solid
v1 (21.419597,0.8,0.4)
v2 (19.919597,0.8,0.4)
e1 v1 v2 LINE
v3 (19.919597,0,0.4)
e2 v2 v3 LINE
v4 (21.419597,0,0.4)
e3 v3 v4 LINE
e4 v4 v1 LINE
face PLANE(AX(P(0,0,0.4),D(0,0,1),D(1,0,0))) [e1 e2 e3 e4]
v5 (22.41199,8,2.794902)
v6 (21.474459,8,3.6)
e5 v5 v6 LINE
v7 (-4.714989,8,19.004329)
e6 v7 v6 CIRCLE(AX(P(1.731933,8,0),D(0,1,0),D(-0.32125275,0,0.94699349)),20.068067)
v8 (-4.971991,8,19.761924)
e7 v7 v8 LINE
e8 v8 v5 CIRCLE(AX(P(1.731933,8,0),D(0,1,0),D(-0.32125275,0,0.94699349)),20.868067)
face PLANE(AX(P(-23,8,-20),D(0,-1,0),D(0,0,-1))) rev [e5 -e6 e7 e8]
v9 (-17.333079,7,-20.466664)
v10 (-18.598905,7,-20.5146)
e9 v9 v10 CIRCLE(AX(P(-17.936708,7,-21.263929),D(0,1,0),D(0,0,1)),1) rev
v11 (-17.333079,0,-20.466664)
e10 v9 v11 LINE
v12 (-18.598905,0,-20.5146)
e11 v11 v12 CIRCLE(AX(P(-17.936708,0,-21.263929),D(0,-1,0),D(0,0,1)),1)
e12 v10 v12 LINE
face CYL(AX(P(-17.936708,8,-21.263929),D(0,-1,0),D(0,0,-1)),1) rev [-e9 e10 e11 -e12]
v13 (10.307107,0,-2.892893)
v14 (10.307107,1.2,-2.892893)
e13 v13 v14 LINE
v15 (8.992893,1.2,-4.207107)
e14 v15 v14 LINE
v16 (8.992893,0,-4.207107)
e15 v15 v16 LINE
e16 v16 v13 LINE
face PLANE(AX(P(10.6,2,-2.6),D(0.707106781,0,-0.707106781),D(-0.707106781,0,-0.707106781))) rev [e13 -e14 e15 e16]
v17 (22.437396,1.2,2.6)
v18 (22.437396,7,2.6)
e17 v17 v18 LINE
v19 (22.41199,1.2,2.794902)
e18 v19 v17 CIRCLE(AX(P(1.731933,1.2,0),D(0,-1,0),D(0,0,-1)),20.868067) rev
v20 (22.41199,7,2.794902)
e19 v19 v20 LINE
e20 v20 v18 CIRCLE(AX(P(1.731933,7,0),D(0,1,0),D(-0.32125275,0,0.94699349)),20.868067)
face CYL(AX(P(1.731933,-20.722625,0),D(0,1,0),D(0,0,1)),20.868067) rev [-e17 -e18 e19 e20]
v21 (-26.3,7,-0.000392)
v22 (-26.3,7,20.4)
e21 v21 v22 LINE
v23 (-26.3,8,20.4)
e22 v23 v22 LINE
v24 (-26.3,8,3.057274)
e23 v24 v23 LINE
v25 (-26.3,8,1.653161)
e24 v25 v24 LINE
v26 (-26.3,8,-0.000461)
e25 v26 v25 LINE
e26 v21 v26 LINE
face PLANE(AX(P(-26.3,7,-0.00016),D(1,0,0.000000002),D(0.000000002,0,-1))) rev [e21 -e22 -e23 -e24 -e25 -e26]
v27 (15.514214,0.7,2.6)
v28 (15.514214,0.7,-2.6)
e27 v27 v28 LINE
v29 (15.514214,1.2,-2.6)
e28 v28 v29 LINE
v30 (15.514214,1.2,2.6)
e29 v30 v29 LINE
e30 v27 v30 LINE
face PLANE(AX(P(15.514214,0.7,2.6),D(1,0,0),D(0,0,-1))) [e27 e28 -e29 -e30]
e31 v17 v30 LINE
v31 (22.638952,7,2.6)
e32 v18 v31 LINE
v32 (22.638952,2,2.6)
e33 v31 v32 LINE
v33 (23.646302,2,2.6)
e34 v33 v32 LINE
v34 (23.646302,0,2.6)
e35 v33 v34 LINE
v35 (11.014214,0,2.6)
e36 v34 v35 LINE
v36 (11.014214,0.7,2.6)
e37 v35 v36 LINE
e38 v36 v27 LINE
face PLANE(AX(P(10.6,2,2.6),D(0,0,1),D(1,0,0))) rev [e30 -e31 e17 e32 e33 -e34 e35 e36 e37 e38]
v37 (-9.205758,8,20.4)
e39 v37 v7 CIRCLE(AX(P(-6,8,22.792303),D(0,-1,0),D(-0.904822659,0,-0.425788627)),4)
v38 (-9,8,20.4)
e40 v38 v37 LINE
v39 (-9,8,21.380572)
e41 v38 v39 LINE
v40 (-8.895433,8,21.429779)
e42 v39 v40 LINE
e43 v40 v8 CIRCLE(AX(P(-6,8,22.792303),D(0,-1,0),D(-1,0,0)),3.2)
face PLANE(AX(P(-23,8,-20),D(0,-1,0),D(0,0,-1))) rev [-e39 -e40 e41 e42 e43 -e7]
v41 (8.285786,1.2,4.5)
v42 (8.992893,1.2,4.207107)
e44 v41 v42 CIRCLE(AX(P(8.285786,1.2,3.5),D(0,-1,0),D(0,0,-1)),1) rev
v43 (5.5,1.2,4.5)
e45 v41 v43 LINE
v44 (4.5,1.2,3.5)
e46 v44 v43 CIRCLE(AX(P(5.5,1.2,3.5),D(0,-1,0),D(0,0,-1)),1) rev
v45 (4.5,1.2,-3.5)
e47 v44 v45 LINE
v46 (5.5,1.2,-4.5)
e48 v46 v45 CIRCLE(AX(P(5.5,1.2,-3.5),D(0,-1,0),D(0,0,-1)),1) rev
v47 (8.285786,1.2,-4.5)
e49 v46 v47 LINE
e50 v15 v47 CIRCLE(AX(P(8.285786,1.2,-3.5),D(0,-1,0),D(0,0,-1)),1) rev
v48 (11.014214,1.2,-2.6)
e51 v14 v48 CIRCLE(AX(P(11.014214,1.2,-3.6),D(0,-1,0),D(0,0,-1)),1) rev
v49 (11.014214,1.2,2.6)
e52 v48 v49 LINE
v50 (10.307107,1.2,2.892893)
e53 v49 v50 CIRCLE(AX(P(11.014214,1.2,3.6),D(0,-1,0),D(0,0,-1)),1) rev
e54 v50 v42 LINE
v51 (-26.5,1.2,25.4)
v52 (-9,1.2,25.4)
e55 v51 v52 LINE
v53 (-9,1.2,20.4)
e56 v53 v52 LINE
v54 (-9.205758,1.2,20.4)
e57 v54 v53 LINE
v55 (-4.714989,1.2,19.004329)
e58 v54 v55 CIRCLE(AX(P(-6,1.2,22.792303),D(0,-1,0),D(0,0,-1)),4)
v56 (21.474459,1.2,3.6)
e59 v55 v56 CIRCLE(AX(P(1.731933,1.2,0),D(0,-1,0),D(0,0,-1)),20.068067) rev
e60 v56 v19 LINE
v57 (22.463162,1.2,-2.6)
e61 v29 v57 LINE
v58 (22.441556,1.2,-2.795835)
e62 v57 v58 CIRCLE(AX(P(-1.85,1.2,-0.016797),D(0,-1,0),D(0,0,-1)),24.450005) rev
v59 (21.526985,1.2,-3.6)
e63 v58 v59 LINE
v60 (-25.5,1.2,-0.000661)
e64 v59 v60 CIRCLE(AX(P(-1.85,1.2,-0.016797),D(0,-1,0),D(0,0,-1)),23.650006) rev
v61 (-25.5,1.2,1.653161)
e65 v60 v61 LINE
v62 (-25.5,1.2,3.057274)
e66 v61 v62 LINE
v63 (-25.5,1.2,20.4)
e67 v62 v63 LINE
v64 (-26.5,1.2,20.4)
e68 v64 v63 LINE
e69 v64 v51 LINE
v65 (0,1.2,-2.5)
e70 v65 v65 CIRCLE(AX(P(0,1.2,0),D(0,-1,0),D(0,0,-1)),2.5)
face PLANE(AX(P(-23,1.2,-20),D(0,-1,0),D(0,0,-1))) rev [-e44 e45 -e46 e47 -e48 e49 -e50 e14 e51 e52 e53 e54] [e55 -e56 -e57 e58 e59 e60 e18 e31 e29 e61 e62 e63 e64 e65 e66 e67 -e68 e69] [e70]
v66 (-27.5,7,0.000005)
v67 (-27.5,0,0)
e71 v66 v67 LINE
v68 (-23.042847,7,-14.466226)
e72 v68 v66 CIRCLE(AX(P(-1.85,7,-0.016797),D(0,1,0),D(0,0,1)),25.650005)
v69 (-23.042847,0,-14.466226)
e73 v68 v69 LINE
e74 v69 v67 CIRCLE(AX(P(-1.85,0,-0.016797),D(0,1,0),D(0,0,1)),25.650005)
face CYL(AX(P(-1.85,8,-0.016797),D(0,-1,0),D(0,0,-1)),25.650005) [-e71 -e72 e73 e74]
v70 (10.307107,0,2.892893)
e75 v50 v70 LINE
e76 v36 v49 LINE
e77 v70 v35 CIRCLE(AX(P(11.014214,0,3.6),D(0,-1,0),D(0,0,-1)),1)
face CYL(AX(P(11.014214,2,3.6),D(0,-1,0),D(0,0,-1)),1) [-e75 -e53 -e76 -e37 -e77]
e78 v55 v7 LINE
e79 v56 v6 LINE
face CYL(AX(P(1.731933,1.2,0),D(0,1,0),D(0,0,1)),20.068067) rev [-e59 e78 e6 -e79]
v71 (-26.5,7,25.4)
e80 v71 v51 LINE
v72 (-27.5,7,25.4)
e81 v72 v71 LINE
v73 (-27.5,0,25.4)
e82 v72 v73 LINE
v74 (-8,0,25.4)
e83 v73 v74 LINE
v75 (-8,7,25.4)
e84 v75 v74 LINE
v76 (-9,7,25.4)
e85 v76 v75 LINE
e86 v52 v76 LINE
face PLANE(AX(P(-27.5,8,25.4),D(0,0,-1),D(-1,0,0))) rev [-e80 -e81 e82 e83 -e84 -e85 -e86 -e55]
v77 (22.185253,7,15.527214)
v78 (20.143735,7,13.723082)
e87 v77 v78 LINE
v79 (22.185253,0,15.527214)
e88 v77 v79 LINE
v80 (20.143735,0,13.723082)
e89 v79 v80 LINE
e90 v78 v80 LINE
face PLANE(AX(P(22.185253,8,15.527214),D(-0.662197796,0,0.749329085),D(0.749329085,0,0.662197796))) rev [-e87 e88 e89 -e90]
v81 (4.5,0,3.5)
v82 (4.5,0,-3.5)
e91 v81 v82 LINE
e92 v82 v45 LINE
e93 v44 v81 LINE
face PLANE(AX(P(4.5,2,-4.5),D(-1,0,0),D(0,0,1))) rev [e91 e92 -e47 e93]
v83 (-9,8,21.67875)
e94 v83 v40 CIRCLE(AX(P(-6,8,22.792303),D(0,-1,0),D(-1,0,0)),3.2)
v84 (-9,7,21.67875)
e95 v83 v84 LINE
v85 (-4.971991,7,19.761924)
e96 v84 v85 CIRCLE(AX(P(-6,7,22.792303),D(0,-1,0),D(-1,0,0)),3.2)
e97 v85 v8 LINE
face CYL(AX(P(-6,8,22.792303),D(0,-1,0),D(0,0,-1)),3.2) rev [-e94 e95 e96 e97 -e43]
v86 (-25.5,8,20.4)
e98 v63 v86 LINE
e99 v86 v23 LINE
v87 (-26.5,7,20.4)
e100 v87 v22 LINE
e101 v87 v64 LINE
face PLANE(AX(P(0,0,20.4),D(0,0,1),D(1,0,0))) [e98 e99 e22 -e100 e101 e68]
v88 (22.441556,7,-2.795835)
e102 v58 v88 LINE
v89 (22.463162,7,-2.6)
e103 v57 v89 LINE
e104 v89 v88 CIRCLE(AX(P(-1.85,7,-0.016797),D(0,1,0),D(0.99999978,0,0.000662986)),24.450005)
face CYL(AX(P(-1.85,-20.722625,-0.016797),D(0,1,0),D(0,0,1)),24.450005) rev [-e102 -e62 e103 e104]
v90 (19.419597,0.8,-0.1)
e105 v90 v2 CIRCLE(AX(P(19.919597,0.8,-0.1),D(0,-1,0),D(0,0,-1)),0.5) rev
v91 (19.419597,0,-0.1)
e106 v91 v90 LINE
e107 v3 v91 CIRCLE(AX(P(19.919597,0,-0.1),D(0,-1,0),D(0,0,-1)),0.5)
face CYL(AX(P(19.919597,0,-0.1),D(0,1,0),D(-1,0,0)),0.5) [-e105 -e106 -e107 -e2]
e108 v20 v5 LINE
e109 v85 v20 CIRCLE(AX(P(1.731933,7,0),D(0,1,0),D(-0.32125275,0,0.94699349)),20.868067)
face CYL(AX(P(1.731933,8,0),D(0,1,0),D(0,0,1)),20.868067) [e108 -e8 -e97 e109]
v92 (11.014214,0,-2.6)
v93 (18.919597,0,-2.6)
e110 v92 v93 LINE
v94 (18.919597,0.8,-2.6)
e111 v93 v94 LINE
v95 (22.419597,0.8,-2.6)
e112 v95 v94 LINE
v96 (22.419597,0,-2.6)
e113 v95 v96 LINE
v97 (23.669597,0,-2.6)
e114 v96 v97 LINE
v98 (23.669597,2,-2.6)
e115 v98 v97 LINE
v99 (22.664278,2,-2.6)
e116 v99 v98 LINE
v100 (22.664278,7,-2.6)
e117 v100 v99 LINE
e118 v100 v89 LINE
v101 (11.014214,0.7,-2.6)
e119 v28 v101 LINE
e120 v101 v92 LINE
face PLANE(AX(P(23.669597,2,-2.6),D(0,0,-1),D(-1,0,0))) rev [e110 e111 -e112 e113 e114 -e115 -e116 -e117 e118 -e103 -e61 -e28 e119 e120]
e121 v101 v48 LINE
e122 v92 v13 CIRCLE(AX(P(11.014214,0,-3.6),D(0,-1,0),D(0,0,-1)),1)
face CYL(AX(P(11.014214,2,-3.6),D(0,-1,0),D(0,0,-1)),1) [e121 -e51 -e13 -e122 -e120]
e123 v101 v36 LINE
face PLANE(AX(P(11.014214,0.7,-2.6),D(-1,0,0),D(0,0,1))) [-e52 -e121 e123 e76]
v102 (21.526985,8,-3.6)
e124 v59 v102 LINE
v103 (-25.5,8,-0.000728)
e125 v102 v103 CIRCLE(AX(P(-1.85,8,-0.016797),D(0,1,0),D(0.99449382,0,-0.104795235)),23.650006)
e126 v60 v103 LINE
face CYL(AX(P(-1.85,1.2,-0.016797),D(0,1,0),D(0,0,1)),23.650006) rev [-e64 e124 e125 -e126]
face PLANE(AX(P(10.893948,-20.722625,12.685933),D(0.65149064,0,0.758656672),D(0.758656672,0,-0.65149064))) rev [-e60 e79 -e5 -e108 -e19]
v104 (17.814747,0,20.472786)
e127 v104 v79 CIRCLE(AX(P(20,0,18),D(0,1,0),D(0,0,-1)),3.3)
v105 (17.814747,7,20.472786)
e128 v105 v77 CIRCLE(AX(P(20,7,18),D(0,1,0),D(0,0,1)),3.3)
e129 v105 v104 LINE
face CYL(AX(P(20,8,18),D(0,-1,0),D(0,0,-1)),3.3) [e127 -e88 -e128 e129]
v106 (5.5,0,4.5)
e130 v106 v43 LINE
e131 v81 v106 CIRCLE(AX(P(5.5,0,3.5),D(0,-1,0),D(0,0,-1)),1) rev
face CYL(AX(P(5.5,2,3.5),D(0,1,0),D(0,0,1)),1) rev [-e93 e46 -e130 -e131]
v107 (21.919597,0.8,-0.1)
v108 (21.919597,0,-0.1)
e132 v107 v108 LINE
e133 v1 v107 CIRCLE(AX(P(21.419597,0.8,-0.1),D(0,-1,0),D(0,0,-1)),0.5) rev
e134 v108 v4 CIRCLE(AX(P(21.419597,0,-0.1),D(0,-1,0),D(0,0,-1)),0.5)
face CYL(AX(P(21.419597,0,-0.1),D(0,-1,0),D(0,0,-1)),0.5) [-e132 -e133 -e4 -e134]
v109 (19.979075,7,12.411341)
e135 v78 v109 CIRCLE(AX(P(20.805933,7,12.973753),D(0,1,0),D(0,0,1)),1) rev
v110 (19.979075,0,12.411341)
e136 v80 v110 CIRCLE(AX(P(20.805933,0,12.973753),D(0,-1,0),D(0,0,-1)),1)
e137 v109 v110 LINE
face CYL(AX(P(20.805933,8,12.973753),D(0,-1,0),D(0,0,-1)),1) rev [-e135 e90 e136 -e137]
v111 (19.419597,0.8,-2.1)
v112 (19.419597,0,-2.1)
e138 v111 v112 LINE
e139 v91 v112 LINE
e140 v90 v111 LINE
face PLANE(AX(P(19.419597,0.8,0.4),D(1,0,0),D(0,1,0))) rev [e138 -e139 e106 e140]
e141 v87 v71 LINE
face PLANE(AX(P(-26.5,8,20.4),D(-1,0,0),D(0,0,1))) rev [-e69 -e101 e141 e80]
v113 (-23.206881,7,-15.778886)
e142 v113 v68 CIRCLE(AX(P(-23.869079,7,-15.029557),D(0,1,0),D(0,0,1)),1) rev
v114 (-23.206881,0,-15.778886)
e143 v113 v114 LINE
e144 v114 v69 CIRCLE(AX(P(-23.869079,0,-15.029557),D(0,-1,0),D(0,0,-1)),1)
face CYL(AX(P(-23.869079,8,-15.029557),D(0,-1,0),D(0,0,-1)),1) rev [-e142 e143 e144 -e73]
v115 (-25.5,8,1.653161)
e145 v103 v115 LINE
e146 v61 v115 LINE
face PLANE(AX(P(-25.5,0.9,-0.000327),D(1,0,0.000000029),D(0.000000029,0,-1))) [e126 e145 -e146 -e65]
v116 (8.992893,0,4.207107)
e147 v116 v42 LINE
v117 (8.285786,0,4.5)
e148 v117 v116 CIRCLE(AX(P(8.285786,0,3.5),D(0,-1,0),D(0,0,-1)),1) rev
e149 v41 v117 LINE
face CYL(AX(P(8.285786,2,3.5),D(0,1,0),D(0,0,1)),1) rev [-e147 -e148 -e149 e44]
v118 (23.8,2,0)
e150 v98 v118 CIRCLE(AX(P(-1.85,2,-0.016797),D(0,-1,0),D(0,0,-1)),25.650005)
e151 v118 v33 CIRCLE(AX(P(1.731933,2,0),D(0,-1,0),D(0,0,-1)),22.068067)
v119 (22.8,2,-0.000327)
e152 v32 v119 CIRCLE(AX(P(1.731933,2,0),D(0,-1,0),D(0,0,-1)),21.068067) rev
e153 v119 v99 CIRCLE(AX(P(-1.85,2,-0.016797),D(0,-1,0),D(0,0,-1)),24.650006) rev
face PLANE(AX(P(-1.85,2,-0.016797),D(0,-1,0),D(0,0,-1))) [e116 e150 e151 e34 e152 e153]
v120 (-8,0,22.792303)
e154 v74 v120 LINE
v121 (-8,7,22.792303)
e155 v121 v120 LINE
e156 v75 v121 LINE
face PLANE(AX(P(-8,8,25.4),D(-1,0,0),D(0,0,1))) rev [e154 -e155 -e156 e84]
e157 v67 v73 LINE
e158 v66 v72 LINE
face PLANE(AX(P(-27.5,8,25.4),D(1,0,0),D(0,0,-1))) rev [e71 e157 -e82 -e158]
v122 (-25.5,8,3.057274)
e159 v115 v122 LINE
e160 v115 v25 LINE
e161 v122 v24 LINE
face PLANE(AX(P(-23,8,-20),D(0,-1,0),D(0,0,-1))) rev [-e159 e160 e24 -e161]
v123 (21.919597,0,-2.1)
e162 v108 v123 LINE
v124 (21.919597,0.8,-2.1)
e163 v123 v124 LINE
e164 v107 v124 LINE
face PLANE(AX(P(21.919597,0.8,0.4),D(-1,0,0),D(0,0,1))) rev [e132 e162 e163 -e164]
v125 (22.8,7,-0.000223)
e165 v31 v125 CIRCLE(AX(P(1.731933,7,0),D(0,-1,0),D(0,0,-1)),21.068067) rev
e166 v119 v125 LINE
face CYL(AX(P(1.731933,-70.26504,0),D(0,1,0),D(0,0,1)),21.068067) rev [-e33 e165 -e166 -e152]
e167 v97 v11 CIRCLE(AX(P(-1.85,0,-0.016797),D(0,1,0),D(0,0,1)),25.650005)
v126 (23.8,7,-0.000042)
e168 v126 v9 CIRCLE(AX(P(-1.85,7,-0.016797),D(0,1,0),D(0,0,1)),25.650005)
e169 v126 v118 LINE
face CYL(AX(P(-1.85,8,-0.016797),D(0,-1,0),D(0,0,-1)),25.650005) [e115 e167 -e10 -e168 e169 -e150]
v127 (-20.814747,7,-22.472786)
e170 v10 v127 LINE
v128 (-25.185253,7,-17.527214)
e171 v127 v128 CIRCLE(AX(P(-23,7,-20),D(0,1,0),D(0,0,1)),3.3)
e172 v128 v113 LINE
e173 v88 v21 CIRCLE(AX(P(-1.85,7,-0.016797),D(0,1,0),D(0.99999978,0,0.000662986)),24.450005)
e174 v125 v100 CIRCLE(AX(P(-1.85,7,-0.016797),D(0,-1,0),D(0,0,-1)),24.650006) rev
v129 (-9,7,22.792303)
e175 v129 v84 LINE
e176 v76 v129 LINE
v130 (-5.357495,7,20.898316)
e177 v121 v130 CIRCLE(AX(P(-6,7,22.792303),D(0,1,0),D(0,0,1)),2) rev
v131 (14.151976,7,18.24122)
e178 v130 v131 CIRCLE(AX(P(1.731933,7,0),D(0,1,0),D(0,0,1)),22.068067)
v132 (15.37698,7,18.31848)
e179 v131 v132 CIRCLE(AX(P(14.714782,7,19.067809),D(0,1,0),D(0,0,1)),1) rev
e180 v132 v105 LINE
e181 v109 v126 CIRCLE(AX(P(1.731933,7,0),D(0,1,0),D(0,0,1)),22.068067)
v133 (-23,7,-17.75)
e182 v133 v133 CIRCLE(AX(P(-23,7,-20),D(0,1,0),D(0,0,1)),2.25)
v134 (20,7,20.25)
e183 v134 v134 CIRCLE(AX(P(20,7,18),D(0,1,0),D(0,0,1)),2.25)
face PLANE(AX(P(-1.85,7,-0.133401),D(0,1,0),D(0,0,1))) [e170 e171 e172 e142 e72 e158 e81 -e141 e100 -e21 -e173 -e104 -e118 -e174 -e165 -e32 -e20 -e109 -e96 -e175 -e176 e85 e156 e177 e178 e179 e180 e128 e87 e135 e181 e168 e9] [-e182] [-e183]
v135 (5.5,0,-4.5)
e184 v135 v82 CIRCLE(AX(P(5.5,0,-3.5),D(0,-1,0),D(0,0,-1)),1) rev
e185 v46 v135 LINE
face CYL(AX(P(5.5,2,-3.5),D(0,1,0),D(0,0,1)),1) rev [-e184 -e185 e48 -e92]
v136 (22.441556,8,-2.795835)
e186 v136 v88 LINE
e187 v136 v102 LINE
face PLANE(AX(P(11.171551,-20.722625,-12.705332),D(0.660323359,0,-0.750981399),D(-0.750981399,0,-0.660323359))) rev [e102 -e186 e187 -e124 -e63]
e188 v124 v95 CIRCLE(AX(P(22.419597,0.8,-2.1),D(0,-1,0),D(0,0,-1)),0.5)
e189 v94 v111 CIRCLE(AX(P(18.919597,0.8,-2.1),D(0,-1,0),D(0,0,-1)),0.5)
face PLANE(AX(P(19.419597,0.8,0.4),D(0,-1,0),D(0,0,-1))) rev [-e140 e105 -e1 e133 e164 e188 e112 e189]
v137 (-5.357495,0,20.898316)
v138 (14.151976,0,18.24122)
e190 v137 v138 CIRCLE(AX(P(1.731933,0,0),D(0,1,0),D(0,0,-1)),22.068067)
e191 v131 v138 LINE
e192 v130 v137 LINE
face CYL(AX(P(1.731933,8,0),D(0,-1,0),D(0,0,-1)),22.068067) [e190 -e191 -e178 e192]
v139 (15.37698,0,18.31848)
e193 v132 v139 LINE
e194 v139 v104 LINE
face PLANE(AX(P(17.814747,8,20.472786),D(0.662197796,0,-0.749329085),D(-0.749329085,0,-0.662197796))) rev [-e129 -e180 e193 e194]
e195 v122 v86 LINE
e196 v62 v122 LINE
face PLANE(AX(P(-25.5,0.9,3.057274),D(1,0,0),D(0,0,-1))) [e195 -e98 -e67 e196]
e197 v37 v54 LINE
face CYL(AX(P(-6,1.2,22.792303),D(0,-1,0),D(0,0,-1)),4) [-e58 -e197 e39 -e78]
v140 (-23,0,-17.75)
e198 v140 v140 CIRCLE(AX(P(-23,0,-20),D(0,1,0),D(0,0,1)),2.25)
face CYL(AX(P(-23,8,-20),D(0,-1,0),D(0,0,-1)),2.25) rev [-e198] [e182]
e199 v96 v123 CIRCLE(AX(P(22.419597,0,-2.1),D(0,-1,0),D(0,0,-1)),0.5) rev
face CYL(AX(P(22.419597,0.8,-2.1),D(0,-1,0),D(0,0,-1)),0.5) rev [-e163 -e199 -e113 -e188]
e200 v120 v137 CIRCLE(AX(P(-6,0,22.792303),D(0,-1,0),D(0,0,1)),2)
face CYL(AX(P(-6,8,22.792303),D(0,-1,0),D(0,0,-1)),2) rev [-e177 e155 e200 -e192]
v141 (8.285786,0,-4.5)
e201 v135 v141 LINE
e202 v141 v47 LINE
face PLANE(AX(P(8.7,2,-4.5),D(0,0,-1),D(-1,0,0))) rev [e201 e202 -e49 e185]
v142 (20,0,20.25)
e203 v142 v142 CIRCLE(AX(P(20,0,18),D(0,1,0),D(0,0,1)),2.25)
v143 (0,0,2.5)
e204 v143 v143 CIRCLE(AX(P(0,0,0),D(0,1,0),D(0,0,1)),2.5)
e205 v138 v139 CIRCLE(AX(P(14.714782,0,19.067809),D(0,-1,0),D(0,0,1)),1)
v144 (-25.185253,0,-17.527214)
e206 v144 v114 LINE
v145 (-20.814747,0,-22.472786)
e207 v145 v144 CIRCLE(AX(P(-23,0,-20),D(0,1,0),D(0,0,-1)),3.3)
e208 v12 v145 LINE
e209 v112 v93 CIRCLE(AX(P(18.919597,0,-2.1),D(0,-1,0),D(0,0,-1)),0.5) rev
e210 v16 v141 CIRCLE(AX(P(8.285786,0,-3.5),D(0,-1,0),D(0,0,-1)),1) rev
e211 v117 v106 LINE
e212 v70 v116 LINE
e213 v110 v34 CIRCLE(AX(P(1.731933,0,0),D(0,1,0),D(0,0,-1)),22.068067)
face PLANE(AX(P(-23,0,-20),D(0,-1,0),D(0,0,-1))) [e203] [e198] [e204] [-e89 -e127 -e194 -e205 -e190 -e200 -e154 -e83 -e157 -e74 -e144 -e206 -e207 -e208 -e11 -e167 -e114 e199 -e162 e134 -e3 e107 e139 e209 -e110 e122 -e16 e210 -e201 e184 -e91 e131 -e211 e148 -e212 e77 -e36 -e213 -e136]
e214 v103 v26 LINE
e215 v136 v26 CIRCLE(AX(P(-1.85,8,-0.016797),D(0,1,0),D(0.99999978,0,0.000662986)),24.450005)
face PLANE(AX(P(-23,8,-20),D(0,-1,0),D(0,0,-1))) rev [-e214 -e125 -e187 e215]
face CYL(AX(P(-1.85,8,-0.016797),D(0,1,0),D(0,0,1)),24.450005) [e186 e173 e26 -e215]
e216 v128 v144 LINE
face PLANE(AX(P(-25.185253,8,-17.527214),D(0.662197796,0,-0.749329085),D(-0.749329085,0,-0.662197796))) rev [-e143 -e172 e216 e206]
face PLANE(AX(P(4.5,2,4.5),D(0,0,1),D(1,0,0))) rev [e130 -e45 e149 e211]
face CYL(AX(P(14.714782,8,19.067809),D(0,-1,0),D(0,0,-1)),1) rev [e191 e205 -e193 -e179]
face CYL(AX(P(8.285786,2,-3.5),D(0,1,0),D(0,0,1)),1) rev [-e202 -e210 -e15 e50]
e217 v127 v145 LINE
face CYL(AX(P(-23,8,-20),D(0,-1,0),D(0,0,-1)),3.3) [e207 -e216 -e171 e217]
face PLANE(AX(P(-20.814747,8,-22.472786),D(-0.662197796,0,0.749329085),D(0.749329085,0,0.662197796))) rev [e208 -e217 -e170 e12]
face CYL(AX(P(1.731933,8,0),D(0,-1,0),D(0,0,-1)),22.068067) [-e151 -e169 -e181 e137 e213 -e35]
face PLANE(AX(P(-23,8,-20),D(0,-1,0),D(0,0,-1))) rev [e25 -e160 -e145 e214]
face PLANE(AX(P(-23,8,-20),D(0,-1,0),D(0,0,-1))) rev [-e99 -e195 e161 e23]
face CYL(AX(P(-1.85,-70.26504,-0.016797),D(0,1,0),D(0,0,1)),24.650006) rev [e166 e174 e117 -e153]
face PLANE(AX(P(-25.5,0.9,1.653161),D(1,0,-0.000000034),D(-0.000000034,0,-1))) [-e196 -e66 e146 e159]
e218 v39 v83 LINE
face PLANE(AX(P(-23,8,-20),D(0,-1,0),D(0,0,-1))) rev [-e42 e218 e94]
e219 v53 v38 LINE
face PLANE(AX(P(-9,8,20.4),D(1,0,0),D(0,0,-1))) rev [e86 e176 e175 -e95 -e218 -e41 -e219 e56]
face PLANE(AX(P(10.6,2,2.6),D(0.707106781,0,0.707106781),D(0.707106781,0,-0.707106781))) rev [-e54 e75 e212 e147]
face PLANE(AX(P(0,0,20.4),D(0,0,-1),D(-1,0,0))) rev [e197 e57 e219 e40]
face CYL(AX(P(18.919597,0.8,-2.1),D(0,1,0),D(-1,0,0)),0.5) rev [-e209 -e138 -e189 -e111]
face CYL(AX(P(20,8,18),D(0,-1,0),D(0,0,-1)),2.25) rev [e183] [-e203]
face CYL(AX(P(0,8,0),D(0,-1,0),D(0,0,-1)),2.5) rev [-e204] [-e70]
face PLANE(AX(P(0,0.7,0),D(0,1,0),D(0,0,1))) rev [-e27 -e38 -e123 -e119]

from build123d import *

# Parameters (mm, degrees)
SKETCH_1_R          = 2.25
SKETCH_1_R_2        = 2.5
EXTRUDE_1_DEPTH     = 8
CUT_EXTRUDE_1_DEPTH = 6.8
SKETCH_3_OUTSIDE_W  = 67.866
SKETCH_3_OUTSIDE_H  = 67.633
CUT_EXTRUDE_4_DEPTH = 1
SKETCH_5_R          = 2.825
SKETCH_5_R_2        = 2.25
EXTRUDE_2_DEPTH     = 1.5
CUT_EXTRUDE_5_DEPTH = 0.5
CUT_EXTRUDE_6_DEPTH = 2
FILLET_1_R          = 1
SKETCH_8_W          = 2.5
SKETCH_8_H          = 0.8
EXTRUDE_4_DEPTH     = 3
FILLET_2_R          = 0.5
CUT_EXTRUDE_7_DEPTH = 0.3
FILLET_3_R          = 0.1
FILLET_4_R          = 3
SKETCH_10_W         = 4.5
SKETCH_10_H         = 5.2
EXTRUDE_5_DEPTH     = 0.5
SKETCH2_W           = 1
SKETCH2_H           = 7.1
CUT_SWEEP1_START    = 7
CUT_SWEEP1_DEPTH    = 1
SKETCH5_R           = 2.825
CUT_EXTRUDE1_DEPTH  = 39.262710934
CUT_EXTRUDE2_REACH  = 40.458
BOSS_EXTRUDE2_REACH = 40.227
BOSS_EXTRUDE1_START = 0.5
BOSS_EXTRUDE1_DEPTH = 0.5
SKETCH_11_W         = 1
SKETCH_11_H         = 6.8
CUT_EXTRUDE_8_DEPTH = 5


# Read off the part's stored shape, not the designer's step: Cut-Sweep1
with BuildPart() as part:
    # Эскиз1 → Бобышка-Вытянуть1 (new body)
    with BuildSketch(Plane(origin=(0, 0, 0), x_dir=(1, 0, 0), z_dir=(0, 1, 0))):
        with BuildLine():
            Line((-27.5, -25.4), (-8, -25.4))
            Line((-8, -25.4), (-8, -22.792302991))
            ThreePointArc((-8, -22.792302991), (-7.16511566, -21.166724479), (-5.357494501, -20.89831601))
            ThreePointArc((-5.357494501, -20.89831601), (4.710003701, -21.866199594), (14.151976117, -18.241220202))
            ThreePointArc((14.151976117, -18.241220202), (14.777726241, -18.069792078), (15.376980036, -18.318480053))
            Line((15.376980036, -18.318480053), (17.814747272, -20.472785982))
            ThreePointArc((17.814747272, -20.472785982), (22.472785982, -20.185252728), (22.185252728, -15.527214018))
            Line((22.185252728, -15.527214018), (20.143734708, -13.723081814))
            ThreePointArc((20.143734708, -13.723081814), (19.813719174, -13.098302749), (19.979075206, -12.411340949))
            ThreePointArc((19.979075206, -12.411340949), (22.823148445, -6.493089604), (23.8, 0))
            ThreePointArc((23.8, 0), (9.576401492, 22.98111988), (-17.333078903, 20.466663618))
            ThreePointArc((-17.333078903, 20.466663618), (-17.974550182, 20.264645495), (-18.598905377, 20.514600122))
            Line((-18.598905377, 20.514600122), (-20.814747272, 22.472785982))
            ThreePointArc((-20.814747272, 22.472785982), (-25.472785982, 22.185252728), (-25.185252728, 17.527214018))
            Line((-25.185252728, 17.527214018), (-23.20688118, 15.778885673))
            ThreePointArc((-23.20688118, 15.778885673), (-22.876796583, 15.153555184), (-23.04284729, 14.466226133))
            ThreePointArc((-23.04284729, 14.466226133), (-26.362874376, 7.569397218), (-27.5, 0))
            Line((-27.5, 0), (-27.5, -25.4))
        make_face()
        with Locations(Location((-23, 20, 0), (0, 0, 270))):
            Circle(SKETCH_1_R, mode=Mode.SUBTRACT)
        with Locations(Location((20, -18, 0), (0, 0, 270))):
            Circle(SKETCH_1_R, mode=Mode.SUBTRACT)
        with Locations(Location((0, 0, 0), (0, 0, 270))):
            Circle(SKETCH_1_R_2, mode=Mode.SUBTRACT)
    extrude(amount=EXTRUDE_1_DEPTH)

    # Эскиз2 → Вырез-Вытянуть1 (cut)
    with BuildSketch(Plane(origin=(0, 8, 0), x_dir=(1, 0, 0), z_dir=(0, 1, 0))):
        with BuildLine():
            Line((-9, -25.4), (-9, -22.792302991))
            ThreePointArc((-9, -22.792302991), (-7.74767349, -20.353935223), (-5.036241751, -19.95132252))
            ThreePointArc((-5.036241751, -19.95132252), (4.575054369, -20.875347093), (13.589169994, -17.414631267))
            ThreePointArc((13.589169994, -17.414631267), (16.632858543, -14.893819788), (19.152217909, -11.84892917))
            ThreePointArc((19.152217909, -11.84892917), (21.867461922, -6.198703298), (22.799999997, 0.000326884))
            ThreePointArc((22.799999997, 0.000326884), (9.131074658, 22.085751778), (-16.729450225, 19.669398029))
            ThreePointArc((-16.729450225, 19.669398029), (-19.707335368, 17.009099388), (-22.216615604, 13.902895678))
            ThreePointArc((-22.216615604, 13.902895678), (-25.407255169, 7.27479247), (-26.500000107, 0.000327424))
            Line((-26.500000107, 0.000327424), (-26.5, -25.4))
            Line((-26.5, -25.4), (-9, -25.4))
        make_face()
    extrude(amount=-CUT_EXTRUDE_1_DEPTH, mode=Mode.SUBTRACT)

    # Эскиз3 outside → Вырез-Вытянуть4 (cut)
    with BuildSketch(Plane(origin=(0, 8, 0), x_dir=(1, 0, 0), z_dir=(0, 1, 0))):
        with Locations((-1.85, 0.1335)):
            Rectangle(SKETCH_3_OUTSIDE_W, SKETCH_3_OUTSIDE_H)
        with BuildLine():
            Line((-8.5, -25.4), (-8.5, -22.792302991))
            ThreePointArc((-8.5, -22.792302991), (-7.456394575, -20.760329851), (-5.196868126, -20.424819265))
            ThreePointArc((-5.196868126, -20.424819265), (14.296629108, -17.530257554), (23.3, 0.000122775))
            ThreePointArc((23.3, 0.000122775), (-1.849981192, 25.166802402), (-26.999999983, 0.000160392))
            Line((-26.999999983, 0.000160392), (-27.000000053, -25.4))
            Line((-27.000000053, -25.4), (-8.5, -25.4))
        make_face(mode=Mode.SUBTRACT)
    extrude(amount=-CUT_EXTRUDE_4_DEPTH, mode=Mode.SUBTRACT)

    # Эскиз5 → Бобышка-Вытянуть2 (add)
    # profile 1 of 2: a face of its own
    with BuildSketch(Plane(origin=(0, 7, 0), x_dir=(1, 0, 0), z_dir=(0, 1, 0))):
        with Locations(Location((20, -18, 0), (0, 0, 270))):
            Circle(SKETCH_5_R)
        with Locations(Location((20, -18, 0), (0, 0, 270))):
            Circle(SKETCH_5_R_2, mode=Mode.SUBTRACT)
    # profile 2 of 2: a face of its own
    with BuildSketch(Plane(origin=(0, 7, 0), x_dir=(1, 0, 0), z_dir=(0, 1, 0))):
        with Locations(Location((-23, 20, 0), (0, 0, 270))):
            Circle(SKETCH_5_R)
        with Locations(Location((-23, 20, 0), (0, 0, 270))):
            Circle(SKETCH_5_R_2, mode=Mode.SUBTRACT)
    extrude(amount=EXTRUDE_2_DEPTH)

    # Эскиз6 → Вырез-Вытянуть5 (cut)
    with BuildSketch(Plane.XZ):
        with BuildLine():
            Line((-8.124359088, -8.831465869), (-12.079320344, -12.786427125))
            Line((-12.079320344, -12.786427125), (-15.112213356, -15.819320137))
            ThreePointArc((-15.112213356, -15.819320137), (-8.444967684, -20.565662067), (-0.5, -22.529692378))
            Line((-0.5, -22.529692378), (-0.5, -18.690864606))
            Line((-0.5, -18.690864606), (-0.5, -11.989578808))
            ThreePointArc((-0.5, -11.989578808), (-4.592201188, -11.08655439), (-8.124359088, -8.831465869))
        make_face()
        with BuildLine():
            Line((-15.787974775, -15.080867994), (-12.786427125, -12.079320344))
            Line((-12.786427125, -12.079320344), (-8.831465869, -8.124359088))
            ThreePointArc((-8.831465869, -8.124359088), (-11.08655439, -4.592201188), (-11.989578808, -0.5))
            Line((-11.989578808, -0.5), (-19.679374583, -0.5))
            Line((-19.679374583, -0.5), (-21.191246789, -0.5))
            ThreePointArc((-21.191246789, -0.5), (-19.828810643, -8.286704941), (-15.787974775, -15.080867994))
        make_face()
        with BuildLine():
            Line((-21.159916823, 0.5), (-19.679374583, 0.5))
            Line((-19.679374583, 0.5), (-11.989578808, 0.5))
            ThreePointArc((-11.989578808, 0.5), (-11.08655439, 4.592201188), (-8.831465869, 8.124359088))
            Line((-8.831465869, 8.124359088), (-11.509243088, 10.802136307))
            Line((-11.509243088, 10.802136307), (-15.133940377, 14.426833596))
            ThreePointArc((-15.133940377, 14.426833596), (-19.393122123, 8.00263002), (-21.159916823, 0.5))
        make_face()
        with BuildLine():
            Line((-14.426833596, 15.133940377), (-10.802136307, 11.509243088))
            Line((-10.802136307, 11.509243088), (-8.124359088, 8.831465869))
            ThreePointArc((-8.124359088, 8.831465869), (-4.592201188, 11.08655439), (-0.5, 11.989578808))
            Line((-0.5, 11.989578808), (-0.5, 17.569097793))
            Line((-0.5, 17.569097793), (-0.5, 21.159916823))
            ThreePointArc((-0.5, 21.159916823), (-8.00263002, 19.393122123), (-14.426833596, 15.133940377))
        make_face()
        with BuildLine():
            Line((0.5, 21.191246789), (0.5, 17.569097793))
            Line((0.5, 17.569097793), (0.5, 11.989578808))
            ThreePointArc((0.5, 11.989578808), (4.592201188, 11.08655439), (8.124359088, 8.831465869))
            Line((8.124359088, 8.831465869), (11.227255938, 11.93436272))
            Line((11.227255938, 11.93436272), (15.080867994, 15.787974775))
            ThreePointArc((15.080867994, 15.787974775), (8.286704941, 19.828810643), (0.5, 21.191246789))
        make_face()
        with BuildLine():
            Line((11.522911958, 3.35), (18.148882908, 3.35))
            Line((18.148882908, 3.35), (22.186495338, 3.35))
            ThreePointArc((22.186495338, 3.35), (19.923839699, 9.729629785), (15.819320137, 15.112213356))
            Line((15.819320137, 15.112213356), (11.93436272, 11.227255938))
            Line((11.93436272, 11.227255938), (8.831465869, 8.124359088))
            ThreePointArc((8.831465869, 8.124359088), (10.453410944, 5.892893995), (11.522911958, 3.35))
        make_face()
        with BuildLine():
            Line((8.831465869, -8.124359088), (10.382914295, -9.675807513))
            Line((10.382914295, -9.675807513), (16.503715933, -15.796609151))
            ThreePointArc((16.503715933, -15.796609151), (20.456263822, -10.049295735), (22.398860789, -3.35))
            Line((22.398860789, -3.35), (18.148882908, -3.35))
            Line((18.148882908, -3.35), (11.522911958, -3.35))
            ThreePointArc((11.522911958, -3.35), (10.453410944, -5.892893995), (8.831465869, -8.124359088))
        make_face()
        with BuildLine():
            Line((0.5, -11.989578808), (0.5, -18.690864606))
            Line((0.5, -18.690864606), (0.5, -22.561022344))
            ThreePointArc((0.5, -22.561022344), (8.739410144, -21.025097131), (15.796609151, -16.503715933))
            Line((15.796609151, -16.503715933), (9.675807513, -10.382914295))
            Line((9.675807513, -10.382914295), (8.124359088, -8.831465869))
            ThreePointArc((8.124359088, -8.831465869), (4.592201188, -11.08655439), (0.5, -11.989578808))
        make_face()
    extrude(amount=-CUT_EXTRUDE_5_DEPTH, mode=Mode.SUBTRACT)

    # Эскиз7 → Вырез-Вытянуть6 (cut)
    with BuildSketch(Plane.XZ):
        with BuildLine():
            Line((23.669597249, -2.6), (10.6, -2.6))
            Line((10.6, -2.6), (8.7, -4.5))
            Line((8.7, -4.5), (4.5, -4.5))
            Line((4.5, -4.5), (4.5, 4.5))
            Line((4.5, 4.5), (8.7, 4.5))
            Line((8.7, 4.5), (10.6, 2.6))
            Line((10.6, 2.6), (23.646302286, 2.6))
            ThreePointArc((23.646302286, 2.6), (23.761542061, 1.30226946), (23.8, 0))
            ThreePointArc((23.8, 0), (23.767804759, -1.30165542), (23.669597249, -2.6))
        make_face()
    extrude(amount=-CUT_EXTRUDE_6_DEPTH, mode=Mode.SUBTRACT)

    # Скругление1
    fillet_1_edges = [part.edges().sort_by_distance(p)[0] for p in [
        (10.6, 0.6, -2.6),
        (8.7, 0.6, -4.5),
        (4.5, 0.6, -4.5),
        (4.5, 0.6, 4.5),
        (8.7, 0.6, 4.5),
        (10.6, 0.6, 2.6),
    ]]
    fillet(fillet_1_edges, radius=FILLET_1_R)

    # Эскиз8 → Бобышка-Вытянуть4 (add)
    with BuildSketch(Plane.XY.offset(-2.6)):
        with Locations((20.669597249, 0.4)):
            Rectangle(SKETCH_8_W, SKETCH_8_H)
    extrude(amount=EXTRUDE_4_DEPTH)

    # Скругление2
    fillet_2_edges = [part.edges().sort_by_distance(p)[0] for p in [
        (21.919597249, 0.4, -2.6),
        (19.419597249, 0.4, -2.6),
        (21.919597249, 0.4, 0.4),
        (19.419597249, 0.4, 0.4),
    ]]
    fillet(fillet_2_edges, radius=FILLET_2_R)

    # Эскиз9 → Вырез-Вытянуть7 (cut)
    with BuildSketch(Plane(origin=(0, 1.2, 0), x_dir=(1, 0, 0), z_dir=(0, 1, 0))):
        with BuildLine():
            Line((-9, -22.792302991), (-9, -25.4))
            Line((-9, -25.4), (-26.500000053, -25.4))
            Line((-26.500000053, -25.4), (-26.500000053, 0.000327424))
            ThreePointArc((-26.500000053, 0.000327424), (-21.616141743, -14.364380593), (-9, -22.792302991))
        make_face()
    extrude(amount=-CUT_EXTRUDE_7_DEPTH, mode=Mode.SUBTRACT)

    # Скругление3
    fillet_3_edges = [part.edges().sort_by_distance(p)[0] for p in [
        (-26.500000053, 1.05, -0.000327424),
    ]]
    fillet(fillet_3_edges, radius=FILLET_3_R)

    # Скругление4
    # the kernel refuses this fillet: 3 mm, written as the material it takes off along each edge
    with BuildSketch(Plane(origin=(-26.400000053, 1.2, 3.057274541), x_dir=(0.992360523213108, 0, -0.1233717632532123), z_dir=(-0.1233717632532123, 0, -0.992360523213108))) as fillet_4_piece_1_section:
        with BuildLine():
            CenterArc((-1.407669683, 3), FILLET_4_R, 270, 25.841932763)
            Line((-0.1, 0.3), (-0.1, 0))
            Line((-0.1, 0), (-1.407669683, 0))
        make_face()
    fillet_4_piece_1 = revolve(axis=Axis((-26.400000053, 1.2, 3.057274541), (0, -1, 0)), revolution_arc=359.64, mode=Mode.PRIVATE)
    fillet_4_piece_1 = split(fillet_4_piece_1, bisect_by=Plane(origin=(-26.500000097, 1.12988638, 2.323319391), z_dir=(1.0, 0, -4.220683577170919e-09)), keep=Keep.TOP, mode=Mode.PRIVATE)
    add(fillet_4_piece_1, mode=Mode.SUBTRACT)
    with BuildSketch(Plane(origin=(-2.886480145, 1.2, -0.01610437), x_dir=(-0.9915657723161722, 0, 0.12960447203331021), z_dir=(-0.12960447203331021, 0, -0.9915657723161722))) as fillet_4_piece_2_section:
        with BuildLine():
            CenterArc((22.305855495, -3), FILLET_4_R, 64.158067237, 25.841932763)
            Line((23.613525178, -0.3), (23.613525178, 0))
            Line((23.613525178, 0), (22.305855495, 0))
        make_face()
    fillet_4_piece_2 = revolve(axis=Axis((-2.886480145, 1.2, -0.01610437), (0, 1, 0)), revolution_arc=75.482624122, mode=Mode.PRIVATE)
    fillet_4_piece_2 = fillet_4_piece_2 - Plane(origin=(-6, 1.12988638, 22.792302991), x_dir=(-1, 0, 0), z_dir=(0, 1, 0)) * Cylinder(3, 95, mode=Mode.PRIVATE)
    add(fillet_4_piece_2, mode=Mode.SUBTRACT)



with BuildPart() as body_2:
    # Эскиз10 → Бобышка-Вытянуть5 (new body)
    with BuildSketch(Plane(origin=(0, 1.2, 0), x_dir=(1, 0, 0), z_dir=(0, 1, 0))):
        with Locations((13.264213562, 0)):
            Rectangle(SKETCH_10_W, SKETCH_10_H)
    extrude(amount=-EXTRUDE_5_DEPTH)


with BuildPart() as part_1:
    add(part.part)

    add(body_2.part)  # Sweep1 merges body 2
    # Sweep1: sweep along a path in Sketch1
    with BuildLine(Plane(origin=(0, 1.2, 0), x_dir=(1, 0, 0), z_dir=(0, 1, 0))) as sweep1_path:
        Line((-26.500000053, -25.4), (-26.500000053, -3.057274222))
        Line((-26.500000053, -3.057274222), (-26.5000001, -1.653161001))
        Line((-26.5000001, -1.653161001), (-26.500000053, 0.000327424))
        ThreePointArc((-26.500000053, 0.000327424), (-3.1516065, 24.632413754), (22.664278196, 2.6))
        Line((22.664278196, 2.6), (11.014213562, 2.6))
        ThreePointArc((11.014213562, 2.6), (10.63153013, 2.676120467), (10.307106781, 2.892893219))
        Line((10.307106781, 2.892893219), (8.992893219, 4.207106781))
        ThreePointArc((8.992893219, 4.207106781), (8.66846987, 4.423879533), (8.285786438, 4.5))
        Line((8.285786438, 4.5), (5.5, 4.5))
        ThreePointArc((5.5, 4.5), (4.792893219, 4.207106781), (4.5, 3.5))
        Line((4.5, 3.5), (4.5, -3.5))
        ThreePointArc((4.5, -3.5), (4.792893219, -4.207106781), (5.5, -4.5))
        Line((5.5, -4.5), (8.285786438, -4.5))
        ThreePointArc((8.285786438, -4.5), (8.66846987, -4.423879533), (8.992893219, -4.207106781))
        Line((8.992893219, -4.207106781), (10.307106781, -2.892893219))
        ThreePointArc((10.307106781, -2.892893219), (10.63153013, -2.676120467), (11.014213562, -2.6))
        Line((11.014213562, -2.6), (22.638952089, -2.6))
        ThreePointArc((22.638952089, -2.6), (12.923171816, -17.849919478), (-5.036241751, -19.95132252))
        ThreePointArc((-5.036241751, -19.95132252), (-7.173656162, -20.0314098), (-8.714467978, -21.51493711))
        ThreePointArc((-8.714467978, -21.51493711), (-8.92774691, -22.137858163), (-9, -22.792302991))
        Line((-9, -22.792302991), (-9, -25.4))
    # Sketch2 → Sweep1 (sweep)
    with BuildSketch(Plane.XY.offset(25.4)):
        with Locations((-26.000000053, 4.45)):
            Rectangle(SKETCH2_W, SKETCH2_H)
    sweep(path=sweep1_path.line, transition=Transition.RIGHT)

    # Cut-Sweep1 outline → Cut-Sweep1 (cut)
    with BuildSketch(Plane(origin=(0, 0, 0), x_dir=(1, 0, 0), z_dir=(0, 1, 0)).offset(CUT_SWEEP1_START)):
        with BuildLine():
            ThreePointArc((22.437396466, -2.6), (12.80639373, -17.687072715), (-4.971991179, -19.761923752))
            ThreePointArc((-4.971991179, -19.761923752), (-7.864185099, -20.191377313), (-9.200000073, -22.792302992))
            Line((-9.200000073, -22.792302992), (-9.200000073, -25.4))
            Line((-9.200000073, -25.4), (-8.5, -25.4))
            Line((-8.5, -25.4), (-8.5, -22.792302991))
            ThreePointArc((-8.5, -22.792302991), (-7.456394575, -20.760329851), (-5.196868126, -20.424819265))
            ThreePointArc((-5.196868126, -20.424819265), (14.296629108, -17.530257554), (23.3, 0.000122775))
            ThreePointArc((23.3, 0.000122775), (-1.849981192, 25.166802381), (-27.000000004, 0.000160391))
            Line((-27.000000004, 0.000160391), (-27.000000053, -25.4))
            Line((-27.000000053, -25.4), (-26.3, -25.4))
            Line((-26.3, -25.4), (-26.29999995, 0.000391914))
            ThreePointArc((-26.29999995, 0.000391914), (-3.151603523, 24.432132117), (22.463161627, 2.6))
            Line((22.463161627, 2.6), (22.664278196, 2.6))
            ThreePointArc((22.664278196, 2.6), (22.766481044, 1.30195634), (22.800000052, 0.000326884))
            ThreePointArc((22.800000052, 0.000326884), (22.759709581, -1.302328371), (22.638952089, -2.6))
            Line((22.638952089, -2.6), (22.437396466, -2.6))
        make_face()
    extrude(amount=CUT_SWEEP1_DEPTH, mode=Mode.SUBTRACT)

    # Sketch5 → Cut-Extrude1 (cut, through all)
    with BuildSketch(Plane(origin=(0, 7, 0), x_dir=(1, 0, 0), z_dir=(0, 1, 0))):
        with Locations((-23, 20)):
            Circle(SKETCH5_R)
        with Locations((20, -18)):
            Circle(SKETCH5_R)
    extrude(amount=CUT_EXTRUDE1_DEPTH, mode=Mode.SUBTRACT)

    # Cut-Extrude2: up to this face of the body (flat: up to its plane)
    cut_extrude2_end = Plane(part_1.part.faces().sort_by_distance((-3.353641126, 1.2, -1.27781855))[0])
    # Sketch6 → Cut-Extrude2 (cut, up to the picked face)
    with BuildSketch(Plane(origin=(0, 8, 0), x_dir=(1, 0, 0), z_dir=(0, 1, 0)), mode=Mode.PRIVATE) as cut_extrude2_sk1:
        with BuildLine():
            Line((8.285786438, 5.5), (5.5, 5.5))
            ThreePointArc((5.5, 5.5), (4.085786438, 4.914213562), (3.5, 3.5))
            Line((3.5, 3.5), (3.5, -3.5))
            ThreePointArc((3.5, -3.5), (4.085786438, -4.914213562), (5.5, -5.5))
            Line((5.5, -5.5), (8.285786438, -5.5))
            ThreePointArc((8.285786438, -5.5), (9.051153302, -5.347759065), (9.7, -4.914213562))
            Line((9.7, -4.914213562), (11.014213562, -3.6))
            Line((11.014213562, -3.6), (11.014213562, -2.6))
            ThreePointArc((11.014213562, -2.6), (10.63153013, -2.676120467), (10.307106781, -2.892893219))
            Line((10.307106781, -2.892893219), (8.992893219, -4.207106781))
            ThreePointArc((8.992893219, -4.207106781), (8.66846987, -4.423879533), (8.285786438, -4.5))
            Line((8.285786438, -4.5), (5.5, -4.5))
            ThreePointArc((5.5, -4.5), (4.792893219, -4.207106781), (4.5, -3.5))
            Line((4.5, -3.5), (4.5, 3.5))
            ThreePointArc((4.5, 3.5), (4.792893219, 4.207106781), (5.5, 4.5))
            Line((5.5, 4.5), (8.285786438, 4.5))
            ThreePointArc((8.285786438, 4.5), (8.66846987, 4.423879533), (8.992893219, 4.207106781))
            Line((8.992893219, 4.207106781), (10.307106781, 2.892893219))
            ThreePointArc((10.307106781, 2.892893219), (10.63153013, 2.676120467), (11.014213562, 2.6))
            Line((11.014213562, 2.6), (22.463161627, 2.6))
            ThreePointArc((22.463161627, 2.6), (22.452556294, 2.69793922), (22.44155644, 2.795834914))
            Line((22.44155644, 2.795834914), (21.526984795, 3.6))
            Line((21.526984795, 3.6), (11.014213562, 3.6))
            Line((11.014213562, 3.6), (9.7, 4.914213562))
            ThreePointArc((9.7, 4.914213562), (9.051153302, 5.347759065), (8.285786438, 5.5))
        make_face()
    cut_extrude2_tool1 = split(extrude(cut_extrude2_sk1.sketch, amount=-CUT_EXTRUDE2_REACH, mode=Mode.PRIVATE), bisect_by=cut_extrude2_end, keep=Keep.BOTH, mode=Mode.PRIVATE)
    # Sketch6 → Cut-Extrude2 (cut, up to the picked face)
    with BuildSketch(Plane(origin=(0, 8, 0), x_dir=(1, 0, 0), z_dir=(0, 1, 0)), mode=Mode.PRIVATE) as cut_extrude2_sk2:
        with BuildLine():
            Line((11.014213562, -3.6), (21.474458504, -3.6))
            Line((21.474458504, -3.6), (22.41198953, -2.794902369))
            ThreePointArc((22.41198953, -2.794902369), (22.424922467, -2.697481098), (22.437396466, -2.6))
            Line((22.437396466, -2.6), (11.014213562, -2.6))
            Line((11.014213562, -2.6), (11.014213562, -3.6))
        make_face()
    cut_extrude2_tool2 = split(extrude(cut_extrude2_sk2.sketch, amount=-CUT_EXTRUDE2_REACH, mode=Mode.PRIVATE), bisect_by=cut_extrude2_end, keep=Keep.BOTH, mode=Mode.PRIVATE)
    add(cut_extrude2_tool1.solids().sort_by(Axis((6.892893, 8, -5.280774), (0, -1, 0)))[0], mode=Mode.SUBTRACT)
    add(cut_extrude2_tool2.solids().sort_by(Axis((16.52998, 8, 3.09197), (0, -1, 0)))[0], mode=Mode.SUBTRACT)

    # Sketch8 → Boss-Extrude2 (add, up to next)
    with BuildSketch(Plane(origin=(0, 1.2, 0), x_dir=(1, 0, 0), z_dir=(0, 1, 0)), mode=Mode.PRIVATE) as boss_extrude2_sk1:
        with BuildLine():
            Line((-25.500000057, -2.939638034), (-25.500000089, -1.974900013))
            ThreePointArc((-25.500000089, -1.974900013), (-25.167059975, -2.378015361), (-25.004203015, -2.874833954))
            ThreePointArc((-25.004203015, -2.874833954), (-20.010058003, -14.278449513), (-9.682030795, -21.229405291))
            ThreePointArc((-9.682030795, -21.229405291), (-9.888367335, -21.853900378), (-9.989579706, -22.5037657))
            ThreePointArc((-9.989579706, -22.5037657), (-9.997394078, -22.647940296), (-10, -22.792302991))
            Line((-10, -22.792302991), (-10, -25.4))
            Line((-10, -25.4), (-25.500000053, -25.4))
            Line((-25.500000053, -25.4), (-25.500000053, -6.782960914))
            Line((-25.500000053, -6.782960914), (-25.500000053, -3.057274188))
            Line((-25.500000053, -3.057274188), (-25.500000057, -2.939638034))
        make_face()
    boss_extrude2_tool1 = extrude(boss_extrude2_sk1.sketch, amount=-BOSS_EXTRUDE2_REACH, mode=Mode.PRIVATE) - part_1.part
    add(boss_extrude2_tool1.solids().sort_by_distance((-19.853848, 1.2, 19.032769))[0])

    # Sketch7 → Boss-Extrude1 (add)
    with BuildSketch(Plane.XZ.offset(-0.5).offset(BOSS_EXTRUDE1_START)):
        with BuildLine():
            Line((0.5, -11.989578808), (0.5, -22.561022344))
            ThreePointArc((0.5, -22.561022344), (8.739410144, -21.025097131), (15.796609151, -16.503715933))
            Line((15.796609151, -16.503715933), (8.124359088, -8.831465869))
            ThreePointArc((8.124359088, -8.831465869), (4.592201188, -11.08655439), (0.5, -11.989578808))
        make_face()
        with BuildLine():
            Line((8.831465869, -8.124359088), (16.503715933, -15.796609151))
            ThreePointArc((16.503715933, -15.796609151), (20.456263822, -10.049295735), (22.398860789, -3.35))
            Line((22.398860789, -3.35), (11.522911958, -3.35))
            ThreePointArc((11.522911958, -3.35), (10.453410944, -5.892893995), (8.831465869, -8.124359088))
        make_face()
        with BuildLine():
            Line((11.522911958, 3.35), (22.186495338, 3.35))
            ThreePointArc((22.186495338, 3.35), (19.923839699, 9.729629785), (15.819320137, 15.112213356))
            Line((15.819320137, 15.112213356), (8.831465869, 8.124359088))
            ThreePointArc((8.831465869, 8.124359088), (10.453410944, 5.892893995), (11.522911958, 3.35))
        make_face()
        with BuildLine():
            Line((8.124359088, 8.831465869), (15.080867994, 15.787974775))
            ThreePointArc((15.080867994, 15.787974775), (8.286704941, 19.828810643), (0.5, 21.191246789))
            Line((0.5, 21.191246789), (0.5, 11.989578808))
            ThreePointArc((0.5, 11.989578808), (4.592201188, 11.08655439), (8.124359088, 8.831465869))
        make_face()
        with BuildLine():
            Line((-0.5, 11.989578808), (-0.5, 21.159916823))
            ThreePointArc((-0.5, 21.159916823), (-8.00263002, 19.393122123), (-14.426833596, 15.133940377))
            Line((-14.426833596, 15.133940377), (-8.124359088, 8.831465869))
            ThreePointArc((-8.124359088, 8.831465869), (-4.592201188, 11.08655439), (-0.5, 11.989578808))
        make_face()
        with BuildLine():
            Line((-8.831465869, 8.124359088), (-15.133940377, 14.426833596))
            ThreePointArc((-15.133940377, 14.426833596), (-19.393122123, 8.00263002), (-21.159916823, 0.5))
            Line((-21.159916823, 0.5), (-11.989578808, 0.5))
            ThreePointArc((-11.989578808, 0.5), (-11.08655439, 4.592201188), (-8.831465869, 8.124359088))
        make_face()
        with BuildLine():
            Line((-11.989578808, -0.5), (-21.191246789, -0.5))
            ThreePointArc((-21.191246789, -0.5), (-19.828810643, -8.286704941), (-15.787974775, -15.080867994))
            Line((-15.787974775, -15.080867994), (-8.831465869, -8.124359088))
            ThreePointArc((-8.831465869, -8.124359088), (-11.08655439, -4.592201188), (-11.989578808, -0.5))
        make_face()
        with BuildLine():
            Line((-8.124359088, -8.831465869), (-15.112213356, -15.819320137))
            ThreePointArc((-15.112213356, -15.819320137), (-8.444967684, -20.565662067), (-0.5, -22.529692378))
            Line((-0.5, -22.529692378), (-0.5, -11.989578808))
            ThreePointArc((-0.5, -11.989578808), (-4.592201188, -11.08655439), (-8.124359088, -8.831465869))
        make_face()
    extrude(amount=-BOSS_EXTRUDE1_DEPTH)

    # Эскиз11 → Вырез-Вытянуть8 (cut)
    with BuildSketch(Plane.XY.offset(25.4)):
        with Locations((-26.000000026, 4.6)):
            Rectangle(SKETCH_11_W, SKETCH_11_H)
        with Locations((-9.500000026, 4.6)):
            Rectangle(SKETCH_11_W, SKETCH_11_H)
    extrude(amount=-CUT_EXTRUDE_8_DEPTH, mode=Mode.SUBTRACT)


solid = part_1.part
